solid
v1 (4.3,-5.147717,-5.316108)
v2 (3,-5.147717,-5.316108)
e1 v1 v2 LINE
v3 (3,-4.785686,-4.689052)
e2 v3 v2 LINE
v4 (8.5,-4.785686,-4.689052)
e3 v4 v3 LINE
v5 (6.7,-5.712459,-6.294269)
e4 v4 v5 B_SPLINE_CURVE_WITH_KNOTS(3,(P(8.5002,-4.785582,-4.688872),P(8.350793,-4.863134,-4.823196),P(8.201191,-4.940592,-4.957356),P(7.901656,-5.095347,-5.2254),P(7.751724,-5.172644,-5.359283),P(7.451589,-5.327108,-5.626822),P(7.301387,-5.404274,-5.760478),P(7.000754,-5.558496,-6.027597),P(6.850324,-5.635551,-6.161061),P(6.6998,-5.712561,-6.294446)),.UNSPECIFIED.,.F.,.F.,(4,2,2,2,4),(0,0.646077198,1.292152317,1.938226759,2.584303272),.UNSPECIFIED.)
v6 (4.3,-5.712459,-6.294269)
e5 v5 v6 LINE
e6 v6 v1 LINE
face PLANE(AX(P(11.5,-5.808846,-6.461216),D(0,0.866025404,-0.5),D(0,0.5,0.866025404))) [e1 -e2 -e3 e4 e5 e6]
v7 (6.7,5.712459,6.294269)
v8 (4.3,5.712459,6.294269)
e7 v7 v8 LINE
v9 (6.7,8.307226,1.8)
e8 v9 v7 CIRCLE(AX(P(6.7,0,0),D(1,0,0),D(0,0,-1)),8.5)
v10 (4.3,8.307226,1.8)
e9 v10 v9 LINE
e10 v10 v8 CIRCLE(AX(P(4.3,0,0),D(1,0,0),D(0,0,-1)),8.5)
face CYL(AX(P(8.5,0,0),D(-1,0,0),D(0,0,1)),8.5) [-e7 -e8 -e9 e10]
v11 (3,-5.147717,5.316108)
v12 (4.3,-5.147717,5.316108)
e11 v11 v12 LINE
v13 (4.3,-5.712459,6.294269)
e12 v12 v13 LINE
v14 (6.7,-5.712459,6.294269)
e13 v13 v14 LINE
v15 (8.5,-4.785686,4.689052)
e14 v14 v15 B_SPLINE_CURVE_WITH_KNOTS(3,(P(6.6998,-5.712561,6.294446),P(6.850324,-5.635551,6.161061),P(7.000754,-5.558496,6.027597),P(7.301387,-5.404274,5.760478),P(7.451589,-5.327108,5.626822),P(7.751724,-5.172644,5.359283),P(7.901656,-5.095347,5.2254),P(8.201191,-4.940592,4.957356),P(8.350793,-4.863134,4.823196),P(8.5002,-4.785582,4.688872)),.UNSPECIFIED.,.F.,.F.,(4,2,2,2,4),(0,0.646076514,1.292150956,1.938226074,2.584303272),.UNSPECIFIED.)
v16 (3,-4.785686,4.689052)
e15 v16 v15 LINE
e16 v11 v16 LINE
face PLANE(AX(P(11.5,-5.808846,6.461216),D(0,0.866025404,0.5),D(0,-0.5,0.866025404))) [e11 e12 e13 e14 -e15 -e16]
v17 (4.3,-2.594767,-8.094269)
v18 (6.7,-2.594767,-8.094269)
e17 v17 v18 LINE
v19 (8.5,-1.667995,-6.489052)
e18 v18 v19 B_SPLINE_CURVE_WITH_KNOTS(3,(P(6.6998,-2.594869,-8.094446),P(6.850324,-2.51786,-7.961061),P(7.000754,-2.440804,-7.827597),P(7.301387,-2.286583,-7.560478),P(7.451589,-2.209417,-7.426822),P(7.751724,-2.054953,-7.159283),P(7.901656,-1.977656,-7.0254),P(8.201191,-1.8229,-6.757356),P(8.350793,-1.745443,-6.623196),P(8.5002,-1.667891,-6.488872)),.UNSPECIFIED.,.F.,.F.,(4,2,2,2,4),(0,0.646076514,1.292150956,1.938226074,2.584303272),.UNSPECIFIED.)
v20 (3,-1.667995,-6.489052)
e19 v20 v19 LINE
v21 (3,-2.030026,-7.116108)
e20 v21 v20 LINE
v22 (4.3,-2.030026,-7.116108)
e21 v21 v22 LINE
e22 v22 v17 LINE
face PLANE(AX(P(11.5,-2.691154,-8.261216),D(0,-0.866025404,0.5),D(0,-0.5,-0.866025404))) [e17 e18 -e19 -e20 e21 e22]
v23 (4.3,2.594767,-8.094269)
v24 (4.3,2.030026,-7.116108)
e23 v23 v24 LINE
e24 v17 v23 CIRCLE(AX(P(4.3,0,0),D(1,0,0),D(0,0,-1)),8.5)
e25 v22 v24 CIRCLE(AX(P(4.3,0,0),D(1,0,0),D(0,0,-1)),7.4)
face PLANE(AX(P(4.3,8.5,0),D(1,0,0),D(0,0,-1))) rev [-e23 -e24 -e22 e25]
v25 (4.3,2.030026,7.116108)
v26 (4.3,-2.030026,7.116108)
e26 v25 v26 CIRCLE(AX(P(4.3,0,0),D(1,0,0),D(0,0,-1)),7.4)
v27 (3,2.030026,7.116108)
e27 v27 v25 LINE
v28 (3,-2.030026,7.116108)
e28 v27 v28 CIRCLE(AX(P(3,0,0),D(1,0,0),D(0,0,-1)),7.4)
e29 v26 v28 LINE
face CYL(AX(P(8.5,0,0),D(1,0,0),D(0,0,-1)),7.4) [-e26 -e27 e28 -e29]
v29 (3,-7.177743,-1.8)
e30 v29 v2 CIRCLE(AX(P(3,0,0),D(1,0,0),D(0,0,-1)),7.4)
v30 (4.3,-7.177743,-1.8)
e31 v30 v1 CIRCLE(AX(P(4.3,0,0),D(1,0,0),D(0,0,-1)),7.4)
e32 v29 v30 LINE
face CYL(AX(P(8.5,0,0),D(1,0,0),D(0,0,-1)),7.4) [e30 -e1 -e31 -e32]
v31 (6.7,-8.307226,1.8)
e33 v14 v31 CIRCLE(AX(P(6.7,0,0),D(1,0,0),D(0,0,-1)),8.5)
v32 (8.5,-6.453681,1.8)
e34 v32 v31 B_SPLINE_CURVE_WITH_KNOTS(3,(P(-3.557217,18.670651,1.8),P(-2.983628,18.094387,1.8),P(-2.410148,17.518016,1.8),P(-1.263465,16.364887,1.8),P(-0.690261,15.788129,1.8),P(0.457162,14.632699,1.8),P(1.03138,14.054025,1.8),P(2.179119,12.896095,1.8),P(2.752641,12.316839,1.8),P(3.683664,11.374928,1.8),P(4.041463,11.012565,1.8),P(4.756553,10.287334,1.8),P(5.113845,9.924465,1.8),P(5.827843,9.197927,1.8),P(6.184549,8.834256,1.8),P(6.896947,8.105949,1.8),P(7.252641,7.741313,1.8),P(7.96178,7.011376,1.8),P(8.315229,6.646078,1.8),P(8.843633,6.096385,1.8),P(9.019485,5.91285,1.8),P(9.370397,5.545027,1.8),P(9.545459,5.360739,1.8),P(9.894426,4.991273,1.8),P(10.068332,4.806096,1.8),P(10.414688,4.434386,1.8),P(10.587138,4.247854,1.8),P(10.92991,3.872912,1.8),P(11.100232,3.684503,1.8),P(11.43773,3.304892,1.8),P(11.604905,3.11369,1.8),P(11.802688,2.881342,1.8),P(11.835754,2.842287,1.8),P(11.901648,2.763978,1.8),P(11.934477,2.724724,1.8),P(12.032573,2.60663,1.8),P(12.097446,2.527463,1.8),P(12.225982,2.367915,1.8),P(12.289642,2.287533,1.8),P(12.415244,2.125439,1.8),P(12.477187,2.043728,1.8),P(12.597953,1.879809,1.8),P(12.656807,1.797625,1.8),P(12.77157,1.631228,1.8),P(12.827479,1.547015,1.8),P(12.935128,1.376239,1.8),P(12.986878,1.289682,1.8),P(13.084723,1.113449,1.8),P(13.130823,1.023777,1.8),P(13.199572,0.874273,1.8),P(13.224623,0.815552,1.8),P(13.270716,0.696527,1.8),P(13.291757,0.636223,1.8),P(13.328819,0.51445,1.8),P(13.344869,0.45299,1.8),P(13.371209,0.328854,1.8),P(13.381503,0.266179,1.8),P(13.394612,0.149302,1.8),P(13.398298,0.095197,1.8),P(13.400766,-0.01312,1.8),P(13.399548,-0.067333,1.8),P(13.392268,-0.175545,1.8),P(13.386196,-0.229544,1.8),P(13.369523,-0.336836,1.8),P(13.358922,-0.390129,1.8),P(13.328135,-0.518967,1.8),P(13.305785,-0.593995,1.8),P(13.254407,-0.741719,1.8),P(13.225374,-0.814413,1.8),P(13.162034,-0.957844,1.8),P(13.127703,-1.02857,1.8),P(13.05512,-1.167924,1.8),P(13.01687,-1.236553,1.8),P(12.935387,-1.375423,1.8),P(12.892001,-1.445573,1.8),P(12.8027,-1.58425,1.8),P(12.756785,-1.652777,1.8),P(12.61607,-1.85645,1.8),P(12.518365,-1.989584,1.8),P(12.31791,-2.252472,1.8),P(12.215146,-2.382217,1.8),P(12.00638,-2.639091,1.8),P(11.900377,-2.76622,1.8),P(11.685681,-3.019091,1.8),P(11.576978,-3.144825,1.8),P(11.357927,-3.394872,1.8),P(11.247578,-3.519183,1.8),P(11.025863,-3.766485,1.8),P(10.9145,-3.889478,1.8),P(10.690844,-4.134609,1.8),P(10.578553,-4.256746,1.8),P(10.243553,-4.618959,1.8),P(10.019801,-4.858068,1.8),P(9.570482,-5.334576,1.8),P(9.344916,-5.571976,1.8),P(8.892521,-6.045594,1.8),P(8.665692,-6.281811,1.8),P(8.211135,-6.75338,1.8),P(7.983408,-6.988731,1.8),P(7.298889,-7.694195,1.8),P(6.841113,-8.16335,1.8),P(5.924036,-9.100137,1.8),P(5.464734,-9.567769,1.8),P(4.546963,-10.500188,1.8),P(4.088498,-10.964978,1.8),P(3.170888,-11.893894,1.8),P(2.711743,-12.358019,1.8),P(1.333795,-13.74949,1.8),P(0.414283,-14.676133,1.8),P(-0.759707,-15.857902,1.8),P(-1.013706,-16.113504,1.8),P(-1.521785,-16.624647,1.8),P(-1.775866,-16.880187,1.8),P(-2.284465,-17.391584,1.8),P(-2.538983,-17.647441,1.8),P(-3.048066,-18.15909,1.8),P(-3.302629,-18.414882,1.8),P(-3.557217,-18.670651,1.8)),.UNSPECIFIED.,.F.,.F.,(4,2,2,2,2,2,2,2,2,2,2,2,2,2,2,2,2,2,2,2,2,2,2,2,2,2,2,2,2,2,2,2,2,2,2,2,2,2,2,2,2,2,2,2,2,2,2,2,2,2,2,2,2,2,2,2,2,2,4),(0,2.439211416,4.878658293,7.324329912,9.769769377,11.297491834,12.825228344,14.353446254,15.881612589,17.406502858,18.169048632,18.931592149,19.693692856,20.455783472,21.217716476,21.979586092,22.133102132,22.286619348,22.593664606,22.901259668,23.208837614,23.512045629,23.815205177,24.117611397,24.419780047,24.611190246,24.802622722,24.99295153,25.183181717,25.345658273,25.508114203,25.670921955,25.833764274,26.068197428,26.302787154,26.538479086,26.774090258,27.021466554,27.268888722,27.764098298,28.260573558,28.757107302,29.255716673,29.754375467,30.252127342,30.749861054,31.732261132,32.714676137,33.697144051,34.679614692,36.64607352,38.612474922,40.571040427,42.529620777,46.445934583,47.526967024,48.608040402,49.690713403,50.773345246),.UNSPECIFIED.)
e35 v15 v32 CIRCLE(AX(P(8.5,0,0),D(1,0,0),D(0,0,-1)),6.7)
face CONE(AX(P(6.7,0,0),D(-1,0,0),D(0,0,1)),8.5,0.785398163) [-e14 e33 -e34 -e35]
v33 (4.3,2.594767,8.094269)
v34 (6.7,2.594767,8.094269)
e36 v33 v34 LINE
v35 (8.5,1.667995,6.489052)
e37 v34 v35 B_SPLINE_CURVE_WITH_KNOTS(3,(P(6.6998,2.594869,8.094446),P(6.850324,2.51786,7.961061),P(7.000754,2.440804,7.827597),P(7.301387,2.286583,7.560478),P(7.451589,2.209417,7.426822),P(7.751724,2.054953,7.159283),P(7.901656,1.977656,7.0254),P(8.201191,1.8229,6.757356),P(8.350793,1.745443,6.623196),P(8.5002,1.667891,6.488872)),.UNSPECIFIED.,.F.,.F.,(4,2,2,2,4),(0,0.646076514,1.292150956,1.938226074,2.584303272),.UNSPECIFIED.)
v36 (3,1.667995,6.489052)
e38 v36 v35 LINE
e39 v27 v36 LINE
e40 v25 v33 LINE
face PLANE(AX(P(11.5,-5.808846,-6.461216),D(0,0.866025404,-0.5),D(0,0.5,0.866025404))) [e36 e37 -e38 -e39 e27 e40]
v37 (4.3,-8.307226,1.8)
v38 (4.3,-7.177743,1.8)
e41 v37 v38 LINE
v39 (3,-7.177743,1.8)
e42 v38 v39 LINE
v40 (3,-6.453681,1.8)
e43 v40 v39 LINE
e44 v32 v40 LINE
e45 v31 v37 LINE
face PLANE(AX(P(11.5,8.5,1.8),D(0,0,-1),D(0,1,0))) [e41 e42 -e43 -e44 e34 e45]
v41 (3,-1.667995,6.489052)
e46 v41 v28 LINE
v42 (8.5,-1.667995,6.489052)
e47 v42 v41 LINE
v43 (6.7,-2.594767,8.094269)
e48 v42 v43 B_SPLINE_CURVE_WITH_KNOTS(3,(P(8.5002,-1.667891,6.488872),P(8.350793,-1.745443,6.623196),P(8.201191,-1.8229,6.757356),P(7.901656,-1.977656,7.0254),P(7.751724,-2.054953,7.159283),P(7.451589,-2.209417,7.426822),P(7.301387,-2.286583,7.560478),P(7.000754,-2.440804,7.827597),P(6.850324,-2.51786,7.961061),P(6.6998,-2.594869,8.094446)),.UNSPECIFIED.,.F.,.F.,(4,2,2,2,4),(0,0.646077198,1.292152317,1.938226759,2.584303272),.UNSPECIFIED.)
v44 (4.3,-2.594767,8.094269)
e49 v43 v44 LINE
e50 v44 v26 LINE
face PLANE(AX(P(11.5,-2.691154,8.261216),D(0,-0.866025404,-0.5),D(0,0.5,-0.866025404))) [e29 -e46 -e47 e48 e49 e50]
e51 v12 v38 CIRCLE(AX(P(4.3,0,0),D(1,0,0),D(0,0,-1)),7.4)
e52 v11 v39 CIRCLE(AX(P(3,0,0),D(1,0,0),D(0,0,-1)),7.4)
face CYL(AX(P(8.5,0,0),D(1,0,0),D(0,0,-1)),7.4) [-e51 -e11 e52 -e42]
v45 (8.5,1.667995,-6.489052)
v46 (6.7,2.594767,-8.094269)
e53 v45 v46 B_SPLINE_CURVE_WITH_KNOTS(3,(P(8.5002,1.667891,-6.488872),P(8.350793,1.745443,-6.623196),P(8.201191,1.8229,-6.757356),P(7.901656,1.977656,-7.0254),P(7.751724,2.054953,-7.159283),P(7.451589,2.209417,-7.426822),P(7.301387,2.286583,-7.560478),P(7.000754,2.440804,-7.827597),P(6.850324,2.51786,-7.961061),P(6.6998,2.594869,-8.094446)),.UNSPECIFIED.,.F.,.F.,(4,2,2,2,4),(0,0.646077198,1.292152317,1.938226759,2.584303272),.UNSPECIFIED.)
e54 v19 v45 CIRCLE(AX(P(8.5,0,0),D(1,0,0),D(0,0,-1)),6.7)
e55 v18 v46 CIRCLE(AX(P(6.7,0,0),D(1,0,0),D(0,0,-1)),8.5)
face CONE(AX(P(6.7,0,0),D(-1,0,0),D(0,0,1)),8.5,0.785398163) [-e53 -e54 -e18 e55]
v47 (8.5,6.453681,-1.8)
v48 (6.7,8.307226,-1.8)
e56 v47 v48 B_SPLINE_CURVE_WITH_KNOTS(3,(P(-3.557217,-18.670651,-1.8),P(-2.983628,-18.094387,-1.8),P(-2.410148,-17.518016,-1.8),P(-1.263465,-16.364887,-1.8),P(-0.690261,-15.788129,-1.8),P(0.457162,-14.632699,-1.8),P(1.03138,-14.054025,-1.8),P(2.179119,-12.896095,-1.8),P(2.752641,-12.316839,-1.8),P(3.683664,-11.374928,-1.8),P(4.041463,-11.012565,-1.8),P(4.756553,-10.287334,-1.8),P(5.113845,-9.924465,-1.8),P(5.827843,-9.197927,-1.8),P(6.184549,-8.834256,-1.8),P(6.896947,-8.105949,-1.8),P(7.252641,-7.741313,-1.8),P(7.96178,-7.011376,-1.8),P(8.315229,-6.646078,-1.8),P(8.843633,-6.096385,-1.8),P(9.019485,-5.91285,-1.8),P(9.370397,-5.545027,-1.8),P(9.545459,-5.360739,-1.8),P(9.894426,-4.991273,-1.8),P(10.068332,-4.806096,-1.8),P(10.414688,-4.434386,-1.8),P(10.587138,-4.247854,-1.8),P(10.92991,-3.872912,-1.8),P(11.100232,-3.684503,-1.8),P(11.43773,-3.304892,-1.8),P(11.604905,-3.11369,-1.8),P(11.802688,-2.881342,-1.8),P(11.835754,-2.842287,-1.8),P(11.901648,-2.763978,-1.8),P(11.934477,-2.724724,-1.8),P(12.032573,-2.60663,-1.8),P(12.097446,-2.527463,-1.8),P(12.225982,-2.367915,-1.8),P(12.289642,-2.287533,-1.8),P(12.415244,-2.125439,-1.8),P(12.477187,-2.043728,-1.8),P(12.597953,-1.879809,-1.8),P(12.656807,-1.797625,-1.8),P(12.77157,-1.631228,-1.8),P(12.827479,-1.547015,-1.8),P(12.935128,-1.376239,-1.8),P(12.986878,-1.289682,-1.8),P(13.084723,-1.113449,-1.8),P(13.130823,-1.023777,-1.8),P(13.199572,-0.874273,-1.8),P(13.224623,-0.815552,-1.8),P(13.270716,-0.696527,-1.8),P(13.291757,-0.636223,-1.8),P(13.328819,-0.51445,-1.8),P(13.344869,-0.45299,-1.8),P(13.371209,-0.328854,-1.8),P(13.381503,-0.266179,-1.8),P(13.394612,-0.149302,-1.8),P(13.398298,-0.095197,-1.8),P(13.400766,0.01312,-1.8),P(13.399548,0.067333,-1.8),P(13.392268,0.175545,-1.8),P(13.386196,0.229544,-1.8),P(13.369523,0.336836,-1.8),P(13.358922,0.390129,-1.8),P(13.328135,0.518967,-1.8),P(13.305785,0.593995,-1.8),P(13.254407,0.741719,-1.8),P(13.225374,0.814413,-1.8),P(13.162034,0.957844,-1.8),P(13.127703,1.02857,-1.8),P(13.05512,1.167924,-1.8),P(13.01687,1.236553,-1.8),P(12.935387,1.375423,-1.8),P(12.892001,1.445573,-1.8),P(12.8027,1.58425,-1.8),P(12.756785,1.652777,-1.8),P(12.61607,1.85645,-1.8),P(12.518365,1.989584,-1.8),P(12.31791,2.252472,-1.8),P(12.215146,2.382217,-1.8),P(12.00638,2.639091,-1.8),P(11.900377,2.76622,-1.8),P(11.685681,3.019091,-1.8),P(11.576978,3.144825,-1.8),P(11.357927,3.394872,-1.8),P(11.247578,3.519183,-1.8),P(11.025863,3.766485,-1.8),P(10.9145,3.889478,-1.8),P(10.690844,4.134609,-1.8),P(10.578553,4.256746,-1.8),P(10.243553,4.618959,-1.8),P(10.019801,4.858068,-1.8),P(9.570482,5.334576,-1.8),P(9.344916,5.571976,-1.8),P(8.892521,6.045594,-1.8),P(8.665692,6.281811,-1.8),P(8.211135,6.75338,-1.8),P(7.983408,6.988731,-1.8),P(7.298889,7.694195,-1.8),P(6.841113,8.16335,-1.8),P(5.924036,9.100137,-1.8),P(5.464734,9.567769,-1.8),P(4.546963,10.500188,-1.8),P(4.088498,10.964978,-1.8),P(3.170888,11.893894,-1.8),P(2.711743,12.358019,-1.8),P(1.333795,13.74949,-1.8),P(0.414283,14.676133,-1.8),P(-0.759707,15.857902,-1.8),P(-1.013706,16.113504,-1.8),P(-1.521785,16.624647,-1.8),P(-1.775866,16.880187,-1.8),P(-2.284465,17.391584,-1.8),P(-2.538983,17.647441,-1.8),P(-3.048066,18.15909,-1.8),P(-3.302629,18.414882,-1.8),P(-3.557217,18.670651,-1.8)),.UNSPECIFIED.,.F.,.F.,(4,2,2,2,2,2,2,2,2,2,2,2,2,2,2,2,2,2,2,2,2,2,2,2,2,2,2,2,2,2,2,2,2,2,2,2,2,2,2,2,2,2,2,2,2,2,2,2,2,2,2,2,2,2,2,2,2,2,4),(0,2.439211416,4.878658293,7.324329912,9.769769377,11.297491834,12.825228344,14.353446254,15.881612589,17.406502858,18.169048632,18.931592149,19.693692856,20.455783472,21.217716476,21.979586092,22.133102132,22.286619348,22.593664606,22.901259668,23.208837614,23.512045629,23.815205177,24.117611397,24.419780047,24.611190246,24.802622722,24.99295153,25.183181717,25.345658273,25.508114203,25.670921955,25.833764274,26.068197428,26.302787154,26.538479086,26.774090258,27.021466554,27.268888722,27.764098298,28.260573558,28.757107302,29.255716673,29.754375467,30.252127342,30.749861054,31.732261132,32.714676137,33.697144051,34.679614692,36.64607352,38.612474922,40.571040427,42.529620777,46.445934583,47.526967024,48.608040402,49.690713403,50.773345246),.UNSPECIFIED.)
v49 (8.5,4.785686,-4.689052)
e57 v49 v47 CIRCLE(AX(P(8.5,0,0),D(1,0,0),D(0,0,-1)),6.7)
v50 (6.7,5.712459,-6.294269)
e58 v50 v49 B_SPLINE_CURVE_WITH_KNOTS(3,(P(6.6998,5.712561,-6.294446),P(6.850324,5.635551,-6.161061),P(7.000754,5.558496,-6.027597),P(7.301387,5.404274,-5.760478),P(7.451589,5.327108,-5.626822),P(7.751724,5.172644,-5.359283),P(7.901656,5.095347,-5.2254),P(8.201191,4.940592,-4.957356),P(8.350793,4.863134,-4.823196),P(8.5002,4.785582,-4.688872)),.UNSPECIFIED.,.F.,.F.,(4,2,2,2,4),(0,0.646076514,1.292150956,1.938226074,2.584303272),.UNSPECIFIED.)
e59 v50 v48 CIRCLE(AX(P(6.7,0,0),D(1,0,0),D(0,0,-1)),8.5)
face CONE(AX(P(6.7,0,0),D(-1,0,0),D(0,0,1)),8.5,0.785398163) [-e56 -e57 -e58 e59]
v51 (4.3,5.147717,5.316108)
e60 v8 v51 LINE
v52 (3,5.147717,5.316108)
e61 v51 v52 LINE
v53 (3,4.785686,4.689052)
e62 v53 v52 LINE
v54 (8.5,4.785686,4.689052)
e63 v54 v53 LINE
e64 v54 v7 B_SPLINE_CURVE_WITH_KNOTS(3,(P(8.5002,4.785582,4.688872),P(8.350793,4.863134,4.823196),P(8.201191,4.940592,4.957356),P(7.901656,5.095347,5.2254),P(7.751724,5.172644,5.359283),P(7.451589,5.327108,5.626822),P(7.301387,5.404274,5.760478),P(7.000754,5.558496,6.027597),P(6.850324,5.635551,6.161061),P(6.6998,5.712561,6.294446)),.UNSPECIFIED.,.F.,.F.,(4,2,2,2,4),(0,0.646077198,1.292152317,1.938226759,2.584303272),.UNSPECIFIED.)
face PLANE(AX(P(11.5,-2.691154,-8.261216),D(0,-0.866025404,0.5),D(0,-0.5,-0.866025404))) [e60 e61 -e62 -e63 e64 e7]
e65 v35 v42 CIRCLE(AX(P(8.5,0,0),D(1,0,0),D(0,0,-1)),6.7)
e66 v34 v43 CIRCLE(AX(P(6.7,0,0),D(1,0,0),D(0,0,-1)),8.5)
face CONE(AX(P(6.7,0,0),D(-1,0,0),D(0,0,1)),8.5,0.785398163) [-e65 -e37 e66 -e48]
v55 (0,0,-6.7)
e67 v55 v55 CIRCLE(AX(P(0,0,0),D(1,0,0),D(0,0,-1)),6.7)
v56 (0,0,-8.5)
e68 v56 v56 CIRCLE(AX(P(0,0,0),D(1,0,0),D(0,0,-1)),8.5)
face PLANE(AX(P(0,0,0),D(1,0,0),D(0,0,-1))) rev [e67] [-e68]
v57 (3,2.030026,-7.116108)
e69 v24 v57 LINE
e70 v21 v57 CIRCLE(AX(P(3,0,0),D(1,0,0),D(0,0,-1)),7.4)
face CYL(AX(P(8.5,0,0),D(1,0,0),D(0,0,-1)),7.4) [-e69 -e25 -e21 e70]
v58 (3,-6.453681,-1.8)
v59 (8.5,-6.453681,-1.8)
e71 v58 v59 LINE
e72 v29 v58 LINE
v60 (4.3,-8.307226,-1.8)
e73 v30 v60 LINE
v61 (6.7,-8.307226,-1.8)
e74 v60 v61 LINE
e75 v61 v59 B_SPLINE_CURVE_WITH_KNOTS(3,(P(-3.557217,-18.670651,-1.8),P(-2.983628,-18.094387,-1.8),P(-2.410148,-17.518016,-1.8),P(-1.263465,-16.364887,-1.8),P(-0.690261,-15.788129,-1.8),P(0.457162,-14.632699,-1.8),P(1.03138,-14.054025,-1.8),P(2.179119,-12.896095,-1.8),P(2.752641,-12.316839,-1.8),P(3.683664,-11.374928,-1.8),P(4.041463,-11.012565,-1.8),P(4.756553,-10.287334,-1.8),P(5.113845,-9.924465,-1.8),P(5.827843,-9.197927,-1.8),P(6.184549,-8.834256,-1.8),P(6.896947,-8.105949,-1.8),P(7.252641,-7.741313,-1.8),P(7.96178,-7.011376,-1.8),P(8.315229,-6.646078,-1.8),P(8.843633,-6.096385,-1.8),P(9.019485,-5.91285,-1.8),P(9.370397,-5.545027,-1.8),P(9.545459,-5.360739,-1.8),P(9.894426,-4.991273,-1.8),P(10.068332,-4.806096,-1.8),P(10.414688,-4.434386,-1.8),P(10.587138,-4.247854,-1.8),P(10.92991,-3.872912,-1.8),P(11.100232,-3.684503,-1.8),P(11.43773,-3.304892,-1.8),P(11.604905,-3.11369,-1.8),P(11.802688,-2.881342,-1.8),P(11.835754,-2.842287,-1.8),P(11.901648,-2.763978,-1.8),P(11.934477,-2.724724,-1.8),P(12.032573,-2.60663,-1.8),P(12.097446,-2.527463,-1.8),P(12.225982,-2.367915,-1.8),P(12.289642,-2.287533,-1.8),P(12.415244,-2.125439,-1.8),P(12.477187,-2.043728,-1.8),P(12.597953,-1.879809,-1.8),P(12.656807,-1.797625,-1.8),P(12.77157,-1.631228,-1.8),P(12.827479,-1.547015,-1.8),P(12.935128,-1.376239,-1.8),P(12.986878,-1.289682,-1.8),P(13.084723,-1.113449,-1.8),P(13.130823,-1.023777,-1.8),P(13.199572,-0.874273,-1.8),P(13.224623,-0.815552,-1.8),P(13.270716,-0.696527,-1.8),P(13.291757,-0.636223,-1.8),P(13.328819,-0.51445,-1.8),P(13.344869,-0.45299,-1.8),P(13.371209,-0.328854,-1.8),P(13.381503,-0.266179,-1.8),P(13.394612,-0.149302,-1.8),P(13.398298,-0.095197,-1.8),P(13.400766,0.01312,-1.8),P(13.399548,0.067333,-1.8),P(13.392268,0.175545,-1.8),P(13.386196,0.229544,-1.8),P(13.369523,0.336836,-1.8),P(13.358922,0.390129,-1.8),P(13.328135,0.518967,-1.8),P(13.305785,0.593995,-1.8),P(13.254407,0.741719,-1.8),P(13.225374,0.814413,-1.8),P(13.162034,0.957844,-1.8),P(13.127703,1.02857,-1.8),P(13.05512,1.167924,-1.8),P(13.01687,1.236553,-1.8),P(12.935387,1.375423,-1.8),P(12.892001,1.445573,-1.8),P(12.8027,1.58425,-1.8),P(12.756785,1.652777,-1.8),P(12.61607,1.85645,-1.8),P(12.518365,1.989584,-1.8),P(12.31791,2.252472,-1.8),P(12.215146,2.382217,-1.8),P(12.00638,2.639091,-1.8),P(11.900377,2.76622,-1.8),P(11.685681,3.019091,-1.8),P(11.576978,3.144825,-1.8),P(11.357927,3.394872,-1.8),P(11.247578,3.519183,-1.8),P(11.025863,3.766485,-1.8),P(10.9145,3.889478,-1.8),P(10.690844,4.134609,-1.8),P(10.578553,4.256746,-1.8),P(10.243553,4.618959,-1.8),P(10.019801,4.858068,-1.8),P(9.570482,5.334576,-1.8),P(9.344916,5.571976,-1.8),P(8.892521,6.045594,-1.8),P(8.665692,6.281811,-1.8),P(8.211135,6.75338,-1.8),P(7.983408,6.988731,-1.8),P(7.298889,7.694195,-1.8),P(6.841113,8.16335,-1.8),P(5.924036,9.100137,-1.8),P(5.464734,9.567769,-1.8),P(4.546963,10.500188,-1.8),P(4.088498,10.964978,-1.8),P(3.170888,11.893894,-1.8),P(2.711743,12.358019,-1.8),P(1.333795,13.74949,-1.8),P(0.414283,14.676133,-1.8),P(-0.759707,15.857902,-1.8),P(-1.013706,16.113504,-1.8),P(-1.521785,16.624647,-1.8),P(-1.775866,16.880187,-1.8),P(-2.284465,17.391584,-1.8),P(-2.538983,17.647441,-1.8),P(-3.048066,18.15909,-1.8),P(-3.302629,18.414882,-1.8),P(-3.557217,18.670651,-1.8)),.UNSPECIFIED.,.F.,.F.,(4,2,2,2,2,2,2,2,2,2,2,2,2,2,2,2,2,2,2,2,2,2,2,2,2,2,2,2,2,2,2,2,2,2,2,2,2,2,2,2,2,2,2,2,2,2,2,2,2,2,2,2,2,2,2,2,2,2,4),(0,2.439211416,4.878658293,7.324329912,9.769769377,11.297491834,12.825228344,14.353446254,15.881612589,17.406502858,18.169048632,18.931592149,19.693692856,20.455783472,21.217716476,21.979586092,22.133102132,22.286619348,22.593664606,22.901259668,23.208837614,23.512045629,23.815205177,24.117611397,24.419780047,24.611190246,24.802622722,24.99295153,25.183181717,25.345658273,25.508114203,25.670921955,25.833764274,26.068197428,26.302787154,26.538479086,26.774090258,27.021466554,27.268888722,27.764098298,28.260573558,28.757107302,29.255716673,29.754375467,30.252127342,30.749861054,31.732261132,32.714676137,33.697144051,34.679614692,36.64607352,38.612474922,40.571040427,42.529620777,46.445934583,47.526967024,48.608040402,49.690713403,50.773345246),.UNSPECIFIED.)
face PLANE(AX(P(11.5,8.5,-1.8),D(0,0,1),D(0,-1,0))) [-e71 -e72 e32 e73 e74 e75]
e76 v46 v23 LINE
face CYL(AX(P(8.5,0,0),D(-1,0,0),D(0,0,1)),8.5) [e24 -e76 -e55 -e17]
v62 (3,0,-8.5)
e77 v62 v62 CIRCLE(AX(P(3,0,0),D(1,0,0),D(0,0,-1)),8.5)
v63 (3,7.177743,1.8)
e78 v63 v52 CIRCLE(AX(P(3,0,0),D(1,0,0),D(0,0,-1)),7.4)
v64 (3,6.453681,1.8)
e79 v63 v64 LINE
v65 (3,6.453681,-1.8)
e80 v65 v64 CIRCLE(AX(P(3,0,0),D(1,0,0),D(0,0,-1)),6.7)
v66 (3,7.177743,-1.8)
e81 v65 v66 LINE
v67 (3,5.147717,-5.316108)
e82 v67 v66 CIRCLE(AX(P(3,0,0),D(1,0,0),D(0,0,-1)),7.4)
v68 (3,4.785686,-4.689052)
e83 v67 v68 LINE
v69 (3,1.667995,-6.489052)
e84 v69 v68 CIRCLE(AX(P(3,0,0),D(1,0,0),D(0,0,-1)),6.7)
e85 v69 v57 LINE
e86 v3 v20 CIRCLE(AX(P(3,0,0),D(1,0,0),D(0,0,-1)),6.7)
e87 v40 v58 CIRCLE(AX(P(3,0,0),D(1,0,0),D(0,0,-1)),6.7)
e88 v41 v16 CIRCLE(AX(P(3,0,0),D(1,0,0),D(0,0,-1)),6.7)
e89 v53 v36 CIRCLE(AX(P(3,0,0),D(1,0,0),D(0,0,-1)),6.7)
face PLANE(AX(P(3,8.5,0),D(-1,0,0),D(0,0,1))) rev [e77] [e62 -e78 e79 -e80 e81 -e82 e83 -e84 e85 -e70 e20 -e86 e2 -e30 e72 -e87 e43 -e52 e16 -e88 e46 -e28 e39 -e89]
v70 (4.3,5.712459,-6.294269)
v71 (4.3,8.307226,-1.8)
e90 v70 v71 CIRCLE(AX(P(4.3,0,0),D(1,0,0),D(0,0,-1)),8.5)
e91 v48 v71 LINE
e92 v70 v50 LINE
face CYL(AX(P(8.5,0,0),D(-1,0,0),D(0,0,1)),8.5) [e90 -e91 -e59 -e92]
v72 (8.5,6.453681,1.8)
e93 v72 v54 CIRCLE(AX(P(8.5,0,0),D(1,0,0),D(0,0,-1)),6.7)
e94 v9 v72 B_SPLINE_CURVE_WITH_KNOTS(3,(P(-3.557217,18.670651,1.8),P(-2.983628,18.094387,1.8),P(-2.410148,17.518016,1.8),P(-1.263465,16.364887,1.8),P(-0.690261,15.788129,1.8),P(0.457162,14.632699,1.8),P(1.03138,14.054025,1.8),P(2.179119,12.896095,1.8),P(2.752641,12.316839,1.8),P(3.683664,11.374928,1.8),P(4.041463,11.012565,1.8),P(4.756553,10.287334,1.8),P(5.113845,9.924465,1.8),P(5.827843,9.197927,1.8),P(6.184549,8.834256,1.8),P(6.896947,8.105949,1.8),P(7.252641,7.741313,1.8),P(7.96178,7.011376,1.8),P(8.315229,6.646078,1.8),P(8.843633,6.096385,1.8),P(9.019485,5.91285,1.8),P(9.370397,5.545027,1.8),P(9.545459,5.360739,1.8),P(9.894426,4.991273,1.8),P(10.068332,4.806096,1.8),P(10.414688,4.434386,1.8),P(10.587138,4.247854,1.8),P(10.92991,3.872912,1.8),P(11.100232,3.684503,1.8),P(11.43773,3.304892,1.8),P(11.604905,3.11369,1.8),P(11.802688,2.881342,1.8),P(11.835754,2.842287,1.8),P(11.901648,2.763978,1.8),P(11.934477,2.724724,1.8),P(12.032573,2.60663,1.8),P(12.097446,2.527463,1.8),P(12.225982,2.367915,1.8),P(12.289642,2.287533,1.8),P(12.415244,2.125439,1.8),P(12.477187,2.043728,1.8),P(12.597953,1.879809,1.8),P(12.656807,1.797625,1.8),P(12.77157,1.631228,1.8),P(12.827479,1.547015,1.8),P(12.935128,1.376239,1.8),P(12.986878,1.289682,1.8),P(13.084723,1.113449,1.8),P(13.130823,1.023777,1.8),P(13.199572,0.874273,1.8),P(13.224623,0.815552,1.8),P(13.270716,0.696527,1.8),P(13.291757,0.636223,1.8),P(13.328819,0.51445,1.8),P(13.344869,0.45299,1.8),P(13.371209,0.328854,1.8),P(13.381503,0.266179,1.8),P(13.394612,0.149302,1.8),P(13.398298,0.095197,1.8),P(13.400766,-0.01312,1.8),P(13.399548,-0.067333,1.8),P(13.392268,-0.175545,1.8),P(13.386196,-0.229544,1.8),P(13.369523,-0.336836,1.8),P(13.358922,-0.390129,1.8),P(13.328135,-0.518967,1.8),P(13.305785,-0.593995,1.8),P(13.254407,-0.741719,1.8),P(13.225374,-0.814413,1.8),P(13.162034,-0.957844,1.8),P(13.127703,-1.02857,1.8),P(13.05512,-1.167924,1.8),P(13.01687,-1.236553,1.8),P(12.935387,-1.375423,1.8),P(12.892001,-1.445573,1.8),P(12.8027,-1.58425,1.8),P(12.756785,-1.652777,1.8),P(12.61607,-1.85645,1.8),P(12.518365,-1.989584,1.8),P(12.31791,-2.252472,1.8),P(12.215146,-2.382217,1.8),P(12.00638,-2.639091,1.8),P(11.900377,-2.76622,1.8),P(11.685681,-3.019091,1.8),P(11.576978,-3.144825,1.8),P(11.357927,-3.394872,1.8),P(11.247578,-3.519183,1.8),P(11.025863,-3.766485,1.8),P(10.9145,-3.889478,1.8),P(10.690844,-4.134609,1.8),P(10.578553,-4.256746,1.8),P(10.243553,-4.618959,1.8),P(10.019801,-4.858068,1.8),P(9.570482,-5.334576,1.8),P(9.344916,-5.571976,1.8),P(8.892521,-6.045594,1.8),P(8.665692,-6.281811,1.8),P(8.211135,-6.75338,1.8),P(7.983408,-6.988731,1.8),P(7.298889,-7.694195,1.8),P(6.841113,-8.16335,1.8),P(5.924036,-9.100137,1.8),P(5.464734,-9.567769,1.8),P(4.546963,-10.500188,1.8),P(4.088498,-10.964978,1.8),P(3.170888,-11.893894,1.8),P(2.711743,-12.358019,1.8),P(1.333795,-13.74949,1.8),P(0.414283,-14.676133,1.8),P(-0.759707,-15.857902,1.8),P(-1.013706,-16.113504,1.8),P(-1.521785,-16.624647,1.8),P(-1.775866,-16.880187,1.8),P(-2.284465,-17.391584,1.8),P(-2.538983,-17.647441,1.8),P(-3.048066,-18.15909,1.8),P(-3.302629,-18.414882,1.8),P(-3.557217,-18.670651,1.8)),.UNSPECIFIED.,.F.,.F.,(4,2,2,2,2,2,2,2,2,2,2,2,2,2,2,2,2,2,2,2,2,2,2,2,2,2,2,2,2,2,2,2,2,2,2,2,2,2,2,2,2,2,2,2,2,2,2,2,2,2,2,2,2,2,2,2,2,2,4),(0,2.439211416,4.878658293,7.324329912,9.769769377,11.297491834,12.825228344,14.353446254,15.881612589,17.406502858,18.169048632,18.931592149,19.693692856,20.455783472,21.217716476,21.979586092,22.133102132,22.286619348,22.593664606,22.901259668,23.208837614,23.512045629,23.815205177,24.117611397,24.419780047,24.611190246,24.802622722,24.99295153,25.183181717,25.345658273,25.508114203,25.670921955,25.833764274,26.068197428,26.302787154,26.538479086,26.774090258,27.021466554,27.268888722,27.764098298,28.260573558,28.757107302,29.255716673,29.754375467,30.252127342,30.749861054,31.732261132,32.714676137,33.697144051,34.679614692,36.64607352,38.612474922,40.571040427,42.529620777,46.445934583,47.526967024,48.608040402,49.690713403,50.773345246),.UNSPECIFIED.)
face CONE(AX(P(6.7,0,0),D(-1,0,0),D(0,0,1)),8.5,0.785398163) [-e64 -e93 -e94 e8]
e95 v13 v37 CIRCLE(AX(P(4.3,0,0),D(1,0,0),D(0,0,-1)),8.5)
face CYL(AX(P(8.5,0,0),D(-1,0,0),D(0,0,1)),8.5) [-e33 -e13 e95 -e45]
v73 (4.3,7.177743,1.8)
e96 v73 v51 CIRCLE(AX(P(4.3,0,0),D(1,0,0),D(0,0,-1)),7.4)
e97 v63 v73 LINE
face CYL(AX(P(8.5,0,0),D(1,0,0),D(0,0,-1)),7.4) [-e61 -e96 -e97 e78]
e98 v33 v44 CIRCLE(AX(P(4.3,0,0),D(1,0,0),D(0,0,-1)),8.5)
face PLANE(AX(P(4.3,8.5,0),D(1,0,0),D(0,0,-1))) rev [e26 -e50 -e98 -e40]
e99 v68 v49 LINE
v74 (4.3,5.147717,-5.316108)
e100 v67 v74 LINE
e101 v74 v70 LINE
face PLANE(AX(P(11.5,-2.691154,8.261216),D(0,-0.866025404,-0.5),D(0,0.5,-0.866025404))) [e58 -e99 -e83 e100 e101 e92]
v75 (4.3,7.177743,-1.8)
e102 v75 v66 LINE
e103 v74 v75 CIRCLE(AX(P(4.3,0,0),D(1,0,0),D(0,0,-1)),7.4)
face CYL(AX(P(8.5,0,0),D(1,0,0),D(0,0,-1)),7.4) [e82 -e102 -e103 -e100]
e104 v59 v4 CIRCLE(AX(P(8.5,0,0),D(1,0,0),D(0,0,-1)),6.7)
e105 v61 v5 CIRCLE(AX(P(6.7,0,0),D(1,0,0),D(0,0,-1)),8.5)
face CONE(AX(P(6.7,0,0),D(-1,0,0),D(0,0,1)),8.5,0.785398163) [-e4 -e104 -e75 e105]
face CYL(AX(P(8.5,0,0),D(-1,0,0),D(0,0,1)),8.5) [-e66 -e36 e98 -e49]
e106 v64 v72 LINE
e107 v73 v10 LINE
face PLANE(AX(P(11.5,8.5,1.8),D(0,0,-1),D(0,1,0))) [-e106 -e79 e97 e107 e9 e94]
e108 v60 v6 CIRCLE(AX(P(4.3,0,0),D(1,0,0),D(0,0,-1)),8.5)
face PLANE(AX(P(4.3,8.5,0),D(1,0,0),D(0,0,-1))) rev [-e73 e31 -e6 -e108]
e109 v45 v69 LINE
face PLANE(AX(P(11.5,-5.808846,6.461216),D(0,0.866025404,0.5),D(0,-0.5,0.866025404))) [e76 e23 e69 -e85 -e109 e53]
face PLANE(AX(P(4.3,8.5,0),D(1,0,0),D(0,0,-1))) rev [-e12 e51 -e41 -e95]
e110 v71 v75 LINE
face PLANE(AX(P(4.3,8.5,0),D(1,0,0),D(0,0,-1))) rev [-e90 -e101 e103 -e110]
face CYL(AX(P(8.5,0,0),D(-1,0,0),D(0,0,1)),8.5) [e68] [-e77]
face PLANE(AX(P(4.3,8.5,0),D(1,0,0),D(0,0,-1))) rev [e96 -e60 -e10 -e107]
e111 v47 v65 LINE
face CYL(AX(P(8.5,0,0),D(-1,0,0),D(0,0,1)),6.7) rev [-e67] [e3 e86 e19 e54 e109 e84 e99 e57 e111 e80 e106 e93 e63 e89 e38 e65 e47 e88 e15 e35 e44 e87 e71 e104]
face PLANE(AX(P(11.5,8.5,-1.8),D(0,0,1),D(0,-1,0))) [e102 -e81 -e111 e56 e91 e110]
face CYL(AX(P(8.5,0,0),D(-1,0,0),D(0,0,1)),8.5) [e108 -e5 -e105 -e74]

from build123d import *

# Parameters (mm, degrees)
SKETCH_1_R               = 8.5
SKETCH_1_R_2             = 6.7
EXTRUDE_1_DEPTH          = 8.5
SKETCH_2_W               = 1.3
SKETCH_2_H               = 1.1
SKETCH_4_W               = 3.6
SKETCH_4_H               = 17
CUT_EXTRUDE_1_DEPTH      = 8.5
PATTERN_START            = 3
PATTERN_CIRCULAR_1_DEPTH = 5.5000001


# Read off the part's stored shape, not the designer's step: Круговой массив1
with BuildPart() as part:
    # Эскиз1 → Вытянуть1 (new body)
    with BuildSketch(Plane(origin=(0, 0, 0), x_dir=(0, 0, -1), z_dir=(1, 0, 0))):
        Circle(SKETCH_1_R)
        Circle(SKETCH_1_R_2, mode=Mode.SUBTRACT)
    extrude(amount=EXTRUDE_1_DEPTH)

    # Эскиз2 → Вырез-Повернуть1 (revolve, cut)
    with BuildSketch(Plane.XY, mode=Mode.PRIVATE) as cut_revolve_1_sk:
        with Locations((3.65, 7.95)):
            Rectangle(SKETCH_2_W, SKETCH_2_H)
    revolve(cut_revolve_1_sk.sketch.rotate(Axis((8.5, 0, 0), (-1, 0, 0)), 90), axis=Axis((8.5, 0, 0), (-1, 0, 0)), mode=Mode.SUBTRACT)

    # Эскиз3 → Вырез-Повернуть2 (revolve, cut)
    with BuildSketch(Plane.XY, mode=Mode.PRIVATE) as cut_revolve_2_sk:
        Polygon((8.5, 6.7), (6.7, 8.5), (8.5, 8.5), align=None)
    revolve(cut_revolve_2_sk.sketch.rotate(Axis((8.5, 0, 0), (-1, 0, 0)), 90), axis=Axis((8.5, 0, 0), (-1, 0, 0)), mode=Mode.SUBTRACT)

    # Эскиз4 → Вырез-Вытянуть1 (cut)
    with BuildSketch(Plane(origin=(3, 0, 0), x_dir=(0, 0, -1), z_dir=(1, 0, 0))):
        Rectangle(SKETCH_4_W, SKETCH_4_H)
    extrude(amount=CUT_EXTRUDE_1_DEPTH, mode=Mode.SUBTRACT)

    # Круговой массив1 outline → Круговой массив1 (cut)
    with BuildSketch(Plane.YZ.offset(PATTERN_START)):
        with BuildLine():
            ThreePointArc((4.785686287, -4.689051798), (3.35, -5.802370205), (1.667994833, -6.489051798))
            Line((1.667994833, -6.489051798), (2.594767158, -8.094268552))
            ThreePointArc((2.594767158, -8.094268552), (4.25, -7.361215932), (5.712458612, -6.294268552))
            Line((5.712458612, -6.294268552), (4.785686287, -4.689051798))
        make_face()
        with BuildLine():
            ThreePointArc((-1.667994833, -6.489051798), (-3.35, -5.802370205), (-4.785686287, -4.689051798))
            Line((-4.785686287, -4.689051798), (-5.712458612, -6.294268552))
            ThreePointArc((-5.712458612, -6.294268552), (-4.25, -7.361215932), (-2.594767158, -8.094268552))
            Line((-2.594767158, -8.094268552), (-1.667994833, -6.489051798))
        make_face()
        with BuildLine():
            ThreePointArc((1.667994833, 6.489051798), (3.35, 5.802370205), (4.785686287, 4.689051798))
            Line((4.785686287, 4.689051798), (5.712458612, 6.294268552))
            ThreePointArc((5.712458612, 6.294268552), (4.25, 7.361215932), (2.594767158, 8.094268552))
            Line((2.594767158, 8.094268552), (1.667994833, 6.489051798))
        make_face()
        with BuildLine():
            ThreePointArc((-4.785686287, 4.689051798), (-3.35, 5.802370205), (-1.667994833, 6.489051798))
            Line((-1.667994833, 6.489051798), (-2.594767158, 8.094268552))
            ThreePointArc((-2.594767158, 8.094268552), (-4.25, 7.361215932), (-5.712458612, 6.294268552))
            Line((-5.712458612, 6.294268552), (-4.785686287, 4.689051798))
        make_face()
    extrude(amount=PATTERN_CIRCULAR_1_DEPTH, mode=Mode.SUBTRACT)


solid = part.part
